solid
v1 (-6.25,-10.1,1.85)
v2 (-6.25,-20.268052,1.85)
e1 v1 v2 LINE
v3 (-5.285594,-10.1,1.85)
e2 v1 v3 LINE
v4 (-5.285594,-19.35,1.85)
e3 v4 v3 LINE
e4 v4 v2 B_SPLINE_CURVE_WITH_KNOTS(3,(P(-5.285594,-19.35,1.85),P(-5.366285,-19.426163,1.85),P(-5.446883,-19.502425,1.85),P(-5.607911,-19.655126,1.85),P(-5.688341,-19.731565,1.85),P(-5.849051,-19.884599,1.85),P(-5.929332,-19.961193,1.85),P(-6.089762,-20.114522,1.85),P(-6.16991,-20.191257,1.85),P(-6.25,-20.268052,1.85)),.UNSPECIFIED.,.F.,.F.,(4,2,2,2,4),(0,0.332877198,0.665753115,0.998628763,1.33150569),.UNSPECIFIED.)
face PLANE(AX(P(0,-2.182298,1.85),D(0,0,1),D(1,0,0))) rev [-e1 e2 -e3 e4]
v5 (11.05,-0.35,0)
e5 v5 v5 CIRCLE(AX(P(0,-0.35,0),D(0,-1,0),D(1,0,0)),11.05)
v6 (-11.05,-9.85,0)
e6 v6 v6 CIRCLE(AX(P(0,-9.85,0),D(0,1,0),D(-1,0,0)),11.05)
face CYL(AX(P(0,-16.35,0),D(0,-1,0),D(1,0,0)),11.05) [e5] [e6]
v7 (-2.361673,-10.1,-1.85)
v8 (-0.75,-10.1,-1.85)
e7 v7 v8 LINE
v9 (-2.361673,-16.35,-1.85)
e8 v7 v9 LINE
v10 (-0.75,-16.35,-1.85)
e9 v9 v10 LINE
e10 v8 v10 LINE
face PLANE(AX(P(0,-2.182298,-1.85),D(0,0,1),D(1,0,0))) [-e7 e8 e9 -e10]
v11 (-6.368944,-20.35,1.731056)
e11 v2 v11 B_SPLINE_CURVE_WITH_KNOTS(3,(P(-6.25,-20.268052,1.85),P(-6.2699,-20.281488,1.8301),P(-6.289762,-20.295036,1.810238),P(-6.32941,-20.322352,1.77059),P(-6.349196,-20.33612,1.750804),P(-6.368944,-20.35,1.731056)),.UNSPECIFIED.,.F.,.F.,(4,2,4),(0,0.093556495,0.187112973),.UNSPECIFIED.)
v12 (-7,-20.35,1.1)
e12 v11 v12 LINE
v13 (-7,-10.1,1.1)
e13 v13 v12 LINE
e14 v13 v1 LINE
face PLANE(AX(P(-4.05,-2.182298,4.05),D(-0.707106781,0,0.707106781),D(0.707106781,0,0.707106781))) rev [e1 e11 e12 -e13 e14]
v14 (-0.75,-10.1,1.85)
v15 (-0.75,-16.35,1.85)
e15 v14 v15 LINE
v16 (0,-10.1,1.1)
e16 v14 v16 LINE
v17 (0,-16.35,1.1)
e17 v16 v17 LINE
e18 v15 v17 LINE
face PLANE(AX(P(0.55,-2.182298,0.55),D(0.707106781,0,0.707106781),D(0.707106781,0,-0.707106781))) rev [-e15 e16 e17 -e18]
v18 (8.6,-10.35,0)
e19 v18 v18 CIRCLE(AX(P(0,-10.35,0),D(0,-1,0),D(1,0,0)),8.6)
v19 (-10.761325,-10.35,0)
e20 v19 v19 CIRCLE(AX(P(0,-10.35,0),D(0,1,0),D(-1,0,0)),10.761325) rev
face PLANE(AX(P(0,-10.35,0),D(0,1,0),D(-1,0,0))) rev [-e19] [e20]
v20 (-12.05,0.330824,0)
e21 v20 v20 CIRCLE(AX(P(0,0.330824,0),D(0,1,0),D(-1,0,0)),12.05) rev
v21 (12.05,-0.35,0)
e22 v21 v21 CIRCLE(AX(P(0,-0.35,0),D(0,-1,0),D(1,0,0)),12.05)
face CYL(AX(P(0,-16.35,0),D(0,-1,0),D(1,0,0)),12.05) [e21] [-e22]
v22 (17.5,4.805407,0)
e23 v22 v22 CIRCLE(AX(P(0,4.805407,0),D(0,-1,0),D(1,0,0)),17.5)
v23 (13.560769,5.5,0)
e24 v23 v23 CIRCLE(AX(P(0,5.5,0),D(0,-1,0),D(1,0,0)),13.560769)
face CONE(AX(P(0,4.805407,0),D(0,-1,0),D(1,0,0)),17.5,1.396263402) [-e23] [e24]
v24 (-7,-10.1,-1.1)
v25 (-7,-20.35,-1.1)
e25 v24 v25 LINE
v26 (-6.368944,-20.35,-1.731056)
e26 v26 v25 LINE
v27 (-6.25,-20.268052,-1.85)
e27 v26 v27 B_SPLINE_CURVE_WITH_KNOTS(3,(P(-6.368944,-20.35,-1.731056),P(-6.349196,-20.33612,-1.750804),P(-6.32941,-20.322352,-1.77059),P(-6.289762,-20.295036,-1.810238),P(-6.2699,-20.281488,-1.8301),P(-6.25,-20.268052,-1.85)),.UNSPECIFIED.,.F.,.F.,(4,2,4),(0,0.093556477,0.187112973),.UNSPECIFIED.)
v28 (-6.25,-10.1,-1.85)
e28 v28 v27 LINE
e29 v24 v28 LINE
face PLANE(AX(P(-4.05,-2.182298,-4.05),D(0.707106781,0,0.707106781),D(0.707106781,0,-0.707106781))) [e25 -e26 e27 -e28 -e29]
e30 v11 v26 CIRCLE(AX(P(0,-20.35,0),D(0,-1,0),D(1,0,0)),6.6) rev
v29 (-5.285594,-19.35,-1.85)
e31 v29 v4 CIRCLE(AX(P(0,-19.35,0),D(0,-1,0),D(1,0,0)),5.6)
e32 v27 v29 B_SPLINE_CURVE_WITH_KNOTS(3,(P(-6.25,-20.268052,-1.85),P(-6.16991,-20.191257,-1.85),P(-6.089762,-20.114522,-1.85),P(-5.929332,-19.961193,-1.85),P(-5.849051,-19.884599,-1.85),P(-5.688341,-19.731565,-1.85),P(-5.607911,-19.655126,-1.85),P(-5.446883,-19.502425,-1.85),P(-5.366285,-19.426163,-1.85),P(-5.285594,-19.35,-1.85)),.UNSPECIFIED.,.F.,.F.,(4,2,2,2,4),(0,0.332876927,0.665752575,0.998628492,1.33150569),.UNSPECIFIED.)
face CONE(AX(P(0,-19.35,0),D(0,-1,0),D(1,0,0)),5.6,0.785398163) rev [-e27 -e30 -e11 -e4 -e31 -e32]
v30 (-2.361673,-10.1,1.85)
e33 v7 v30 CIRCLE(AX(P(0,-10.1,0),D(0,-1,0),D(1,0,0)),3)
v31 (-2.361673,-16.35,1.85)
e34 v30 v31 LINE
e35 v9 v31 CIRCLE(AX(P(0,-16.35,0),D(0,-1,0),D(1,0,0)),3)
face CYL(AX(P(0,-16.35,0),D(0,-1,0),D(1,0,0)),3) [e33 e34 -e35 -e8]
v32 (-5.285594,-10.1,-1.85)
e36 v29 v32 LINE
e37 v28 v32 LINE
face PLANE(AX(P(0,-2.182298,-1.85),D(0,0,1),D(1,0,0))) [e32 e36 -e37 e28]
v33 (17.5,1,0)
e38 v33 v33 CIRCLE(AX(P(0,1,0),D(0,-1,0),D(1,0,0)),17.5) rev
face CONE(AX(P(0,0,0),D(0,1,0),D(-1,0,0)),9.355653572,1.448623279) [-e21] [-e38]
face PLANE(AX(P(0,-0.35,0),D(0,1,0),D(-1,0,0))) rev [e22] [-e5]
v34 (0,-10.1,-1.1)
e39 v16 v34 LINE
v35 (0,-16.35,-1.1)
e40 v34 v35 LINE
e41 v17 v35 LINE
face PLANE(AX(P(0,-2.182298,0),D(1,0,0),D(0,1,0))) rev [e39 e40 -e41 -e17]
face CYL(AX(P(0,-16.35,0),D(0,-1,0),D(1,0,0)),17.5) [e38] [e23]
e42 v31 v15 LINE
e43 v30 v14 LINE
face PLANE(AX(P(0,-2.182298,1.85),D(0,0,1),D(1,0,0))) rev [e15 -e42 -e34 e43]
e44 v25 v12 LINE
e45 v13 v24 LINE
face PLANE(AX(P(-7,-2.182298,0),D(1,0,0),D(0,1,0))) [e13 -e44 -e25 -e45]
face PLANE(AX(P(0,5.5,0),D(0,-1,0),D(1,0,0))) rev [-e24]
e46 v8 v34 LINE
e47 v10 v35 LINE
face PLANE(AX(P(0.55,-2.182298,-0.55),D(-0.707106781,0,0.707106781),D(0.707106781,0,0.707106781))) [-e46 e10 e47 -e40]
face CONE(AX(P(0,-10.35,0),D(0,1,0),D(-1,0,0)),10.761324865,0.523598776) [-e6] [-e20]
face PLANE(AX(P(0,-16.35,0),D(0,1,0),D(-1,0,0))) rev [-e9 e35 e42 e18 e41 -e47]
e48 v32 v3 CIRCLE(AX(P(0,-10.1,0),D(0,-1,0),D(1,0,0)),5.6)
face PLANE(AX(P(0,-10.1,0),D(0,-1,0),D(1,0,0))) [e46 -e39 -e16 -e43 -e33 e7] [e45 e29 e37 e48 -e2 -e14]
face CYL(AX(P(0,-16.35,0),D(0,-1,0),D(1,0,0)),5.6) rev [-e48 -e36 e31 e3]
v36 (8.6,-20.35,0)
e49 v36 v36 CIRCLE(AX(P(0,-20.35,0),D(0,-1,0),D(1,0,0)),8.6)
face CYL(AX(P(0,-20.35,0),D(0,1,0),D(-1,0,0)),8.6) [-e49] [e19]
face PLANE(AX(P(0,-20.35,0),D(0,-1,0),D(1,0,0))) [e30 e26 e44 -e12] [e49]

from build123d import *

# Parameters (mm, degrees)
CHAMFER2_SIZE                  = 8.144346428
CHAMFER2_SIZE_2                = 1
SKETCH8_R                      = 8.6
SKETCH8_R_2                    = 5.6
BOSS_EXTRUDE7_DEPTH            = 10
CUT_EXTRUDE1_REACH             = 35.014
CUT_EXTRUDE1_DIRECTION_2_REACH = 35.014
CHAMFER1_SIZE                  = 1
CHAMFER3_SIZE                  = 0.5
CHAMFER3_SIZE2                 = 0.288675135


with BuildPart() as part:
    # Sketch1 → Revolve1 (revolve)
    with BuildSketch(Plane.XY, mode=Mode.PRIVATE) as revolve1_sk:
        Polygon((-13.560768988, 5.5), (-17.5, 4.805407289), (-17.5, 0), (-12.05, 0), (-12.05, -0.35), (-11.05, -0.35), (-11.05, -10.35), (-5.6, -10.35), (-5.6, -10.1), (-3, -10.1), (-3, -16.35), (0, -16.35), (0, 5.5), align=None)
    revolve(revolve1_sk.sketch.rotate(Axis((0, -16.35, 0), (0, 1, 0)), 180), axis=Axis((0, -16.35, 0), (0, 1, 0)))

    # Chamfer2
    # the kernel refuses this chamfer: 8.144346428, 1 mm, written as the material it takes off along each edge
    with BuildSketch(Plane(origin=(0, 0, 0), x_dir=(1, 0, 0), z_dir=(0, 0, 1))) as chamfer2_piece_1_section:
        Polygon((17.5 - CHAMFER2_SIZE, 0), (17.5, CHAMFER2_SIZE_2), (17.5, 0), align=None)
    chamfer2_piece_1 = revolve(axis=Axis((0, 0, 0), (0, 1, 0)), mode=Mode.PRIVATE)
    chamfer2_piece_1 = chamfer2_piece_1 - Plane(origin=(0, 0.608985378, 0), x_dir=(1, 0, 0), z_dir=(0, -1, 0)) * Cylinder(12.05, 70, mode=Mode.PRIVATE)
    add(chamfer2_piece_1, mode=Mode.SUBTRACT)

    # Sketch8 → Boss-Extrude7 (add)
    with BuildSketch(Plane.XZ.offset(10.35)):
        Circle(SKETCH8_R)
        Circle(SKETCH8_R_2, mode=Mode.SUBTRACT)
    extrude(amount=BOSS_EXTRUDE7_DEPTH)

    # Cut-Extrude1: up to this face of the body (flat: up to its plane)
    cut_extrude1_end = Plane(part.part.faces().sort_by_distance((-5.441608081, -10.1, 0))[0])
    # Sketch2 → Cut-Extrude1 (cut, up to the picked face)
    with BuildSketch(Plane.XZ.offset(16.35), mode=Mode.PRIVATE) as cut_extrude1_sk1:
        Polygon((-6.25, 1.85), (-7, 1.1), (-7, -1.1), (-6.25, -1.85), (-0.75, -1.85), (0, -1.1), (0, 1.1), (-0.75, 1.85), align=None)
    cut_extrude1_tool1 = split(extrude(cut_extrude1_sk1.sketch, amount=-CUT_EXTRUDE1_REACH, mode=Mode.PRIVATE), bisect_by=cut_extrude1_end, keep=Keep.BOTH, mode=Mode.PRIVATE)
    add(cut_extrude1_tool1.solids().sort_by(Axis((-3.5, -16.35, 0), (0, 1, 0)))[0], mode=Mode.SUBTRACT)

    # Cut-Extrude1 direction 2: up to this face of the body (flat: up to its plane)
    cut_extrude1_direction_2_end = Plane(part.part.faces().sort_by_distance((-8.356755267, -20.35, 0))[0])
    # Sketch2 → Cut-Extrude1 direction 2 (cut, up to the picked face)
    with BuildSketch(Plane.XZ.offset(16.35), mode=Mode.PRIVATE) as cut_extrude1_direction_2_sk1:
        Polygon((-6.25, 1.85), (-7, 1.1), (-7, -1.1), (-6.25, -1.85), (-0.75, -1.85), (0, -1.1), (0, 1.1), (-0.75, 1.85), align=None)
    cut_extrude1_direction_2_tool1 = split(extrude(cut_extrude1_direction_2_sk1.sketch, amount=CUT_EXTRUDE1_DIRECTION_2_REACH, mode=Mode.PRIVATE), bisect_by=cut_extrude1_direction_2_end, keep=Keep.BOTH, mode=Mode.PRIVATE)
    add(cut_extrude1_direction_2_tool1.solids().sort_by(Axis((-3.5, -16.35, 0), (0, -1, 0)))[0], mode=Mode.SUBTRACT)

    # Chamfer1
    chamfer1_edges = [part.edges().sort_by_distance(p)[0] for p in [
        (5.6, -20.35, 0),
    ]]
    chamfer(chamfer1_edges, length=CHAMFER1_SIZE)

    # Chamfer3
    chamfer3_edges = [part.edges().sort_by_distance(p)[0] for p in [
        (-11.05, -10.35, 0),
    ]]
    chamfer3_side = [part.faces().sort_by_distance(p)[0] for p in [
        (-11.05, -5.35, 0),
    ]]
    chamfer(chamfer3_edges, length=CHAMFER3_SIZE, length2=CHAMFER3_SIZE2, reference=chamfer3_side[0])


solid = part.part
